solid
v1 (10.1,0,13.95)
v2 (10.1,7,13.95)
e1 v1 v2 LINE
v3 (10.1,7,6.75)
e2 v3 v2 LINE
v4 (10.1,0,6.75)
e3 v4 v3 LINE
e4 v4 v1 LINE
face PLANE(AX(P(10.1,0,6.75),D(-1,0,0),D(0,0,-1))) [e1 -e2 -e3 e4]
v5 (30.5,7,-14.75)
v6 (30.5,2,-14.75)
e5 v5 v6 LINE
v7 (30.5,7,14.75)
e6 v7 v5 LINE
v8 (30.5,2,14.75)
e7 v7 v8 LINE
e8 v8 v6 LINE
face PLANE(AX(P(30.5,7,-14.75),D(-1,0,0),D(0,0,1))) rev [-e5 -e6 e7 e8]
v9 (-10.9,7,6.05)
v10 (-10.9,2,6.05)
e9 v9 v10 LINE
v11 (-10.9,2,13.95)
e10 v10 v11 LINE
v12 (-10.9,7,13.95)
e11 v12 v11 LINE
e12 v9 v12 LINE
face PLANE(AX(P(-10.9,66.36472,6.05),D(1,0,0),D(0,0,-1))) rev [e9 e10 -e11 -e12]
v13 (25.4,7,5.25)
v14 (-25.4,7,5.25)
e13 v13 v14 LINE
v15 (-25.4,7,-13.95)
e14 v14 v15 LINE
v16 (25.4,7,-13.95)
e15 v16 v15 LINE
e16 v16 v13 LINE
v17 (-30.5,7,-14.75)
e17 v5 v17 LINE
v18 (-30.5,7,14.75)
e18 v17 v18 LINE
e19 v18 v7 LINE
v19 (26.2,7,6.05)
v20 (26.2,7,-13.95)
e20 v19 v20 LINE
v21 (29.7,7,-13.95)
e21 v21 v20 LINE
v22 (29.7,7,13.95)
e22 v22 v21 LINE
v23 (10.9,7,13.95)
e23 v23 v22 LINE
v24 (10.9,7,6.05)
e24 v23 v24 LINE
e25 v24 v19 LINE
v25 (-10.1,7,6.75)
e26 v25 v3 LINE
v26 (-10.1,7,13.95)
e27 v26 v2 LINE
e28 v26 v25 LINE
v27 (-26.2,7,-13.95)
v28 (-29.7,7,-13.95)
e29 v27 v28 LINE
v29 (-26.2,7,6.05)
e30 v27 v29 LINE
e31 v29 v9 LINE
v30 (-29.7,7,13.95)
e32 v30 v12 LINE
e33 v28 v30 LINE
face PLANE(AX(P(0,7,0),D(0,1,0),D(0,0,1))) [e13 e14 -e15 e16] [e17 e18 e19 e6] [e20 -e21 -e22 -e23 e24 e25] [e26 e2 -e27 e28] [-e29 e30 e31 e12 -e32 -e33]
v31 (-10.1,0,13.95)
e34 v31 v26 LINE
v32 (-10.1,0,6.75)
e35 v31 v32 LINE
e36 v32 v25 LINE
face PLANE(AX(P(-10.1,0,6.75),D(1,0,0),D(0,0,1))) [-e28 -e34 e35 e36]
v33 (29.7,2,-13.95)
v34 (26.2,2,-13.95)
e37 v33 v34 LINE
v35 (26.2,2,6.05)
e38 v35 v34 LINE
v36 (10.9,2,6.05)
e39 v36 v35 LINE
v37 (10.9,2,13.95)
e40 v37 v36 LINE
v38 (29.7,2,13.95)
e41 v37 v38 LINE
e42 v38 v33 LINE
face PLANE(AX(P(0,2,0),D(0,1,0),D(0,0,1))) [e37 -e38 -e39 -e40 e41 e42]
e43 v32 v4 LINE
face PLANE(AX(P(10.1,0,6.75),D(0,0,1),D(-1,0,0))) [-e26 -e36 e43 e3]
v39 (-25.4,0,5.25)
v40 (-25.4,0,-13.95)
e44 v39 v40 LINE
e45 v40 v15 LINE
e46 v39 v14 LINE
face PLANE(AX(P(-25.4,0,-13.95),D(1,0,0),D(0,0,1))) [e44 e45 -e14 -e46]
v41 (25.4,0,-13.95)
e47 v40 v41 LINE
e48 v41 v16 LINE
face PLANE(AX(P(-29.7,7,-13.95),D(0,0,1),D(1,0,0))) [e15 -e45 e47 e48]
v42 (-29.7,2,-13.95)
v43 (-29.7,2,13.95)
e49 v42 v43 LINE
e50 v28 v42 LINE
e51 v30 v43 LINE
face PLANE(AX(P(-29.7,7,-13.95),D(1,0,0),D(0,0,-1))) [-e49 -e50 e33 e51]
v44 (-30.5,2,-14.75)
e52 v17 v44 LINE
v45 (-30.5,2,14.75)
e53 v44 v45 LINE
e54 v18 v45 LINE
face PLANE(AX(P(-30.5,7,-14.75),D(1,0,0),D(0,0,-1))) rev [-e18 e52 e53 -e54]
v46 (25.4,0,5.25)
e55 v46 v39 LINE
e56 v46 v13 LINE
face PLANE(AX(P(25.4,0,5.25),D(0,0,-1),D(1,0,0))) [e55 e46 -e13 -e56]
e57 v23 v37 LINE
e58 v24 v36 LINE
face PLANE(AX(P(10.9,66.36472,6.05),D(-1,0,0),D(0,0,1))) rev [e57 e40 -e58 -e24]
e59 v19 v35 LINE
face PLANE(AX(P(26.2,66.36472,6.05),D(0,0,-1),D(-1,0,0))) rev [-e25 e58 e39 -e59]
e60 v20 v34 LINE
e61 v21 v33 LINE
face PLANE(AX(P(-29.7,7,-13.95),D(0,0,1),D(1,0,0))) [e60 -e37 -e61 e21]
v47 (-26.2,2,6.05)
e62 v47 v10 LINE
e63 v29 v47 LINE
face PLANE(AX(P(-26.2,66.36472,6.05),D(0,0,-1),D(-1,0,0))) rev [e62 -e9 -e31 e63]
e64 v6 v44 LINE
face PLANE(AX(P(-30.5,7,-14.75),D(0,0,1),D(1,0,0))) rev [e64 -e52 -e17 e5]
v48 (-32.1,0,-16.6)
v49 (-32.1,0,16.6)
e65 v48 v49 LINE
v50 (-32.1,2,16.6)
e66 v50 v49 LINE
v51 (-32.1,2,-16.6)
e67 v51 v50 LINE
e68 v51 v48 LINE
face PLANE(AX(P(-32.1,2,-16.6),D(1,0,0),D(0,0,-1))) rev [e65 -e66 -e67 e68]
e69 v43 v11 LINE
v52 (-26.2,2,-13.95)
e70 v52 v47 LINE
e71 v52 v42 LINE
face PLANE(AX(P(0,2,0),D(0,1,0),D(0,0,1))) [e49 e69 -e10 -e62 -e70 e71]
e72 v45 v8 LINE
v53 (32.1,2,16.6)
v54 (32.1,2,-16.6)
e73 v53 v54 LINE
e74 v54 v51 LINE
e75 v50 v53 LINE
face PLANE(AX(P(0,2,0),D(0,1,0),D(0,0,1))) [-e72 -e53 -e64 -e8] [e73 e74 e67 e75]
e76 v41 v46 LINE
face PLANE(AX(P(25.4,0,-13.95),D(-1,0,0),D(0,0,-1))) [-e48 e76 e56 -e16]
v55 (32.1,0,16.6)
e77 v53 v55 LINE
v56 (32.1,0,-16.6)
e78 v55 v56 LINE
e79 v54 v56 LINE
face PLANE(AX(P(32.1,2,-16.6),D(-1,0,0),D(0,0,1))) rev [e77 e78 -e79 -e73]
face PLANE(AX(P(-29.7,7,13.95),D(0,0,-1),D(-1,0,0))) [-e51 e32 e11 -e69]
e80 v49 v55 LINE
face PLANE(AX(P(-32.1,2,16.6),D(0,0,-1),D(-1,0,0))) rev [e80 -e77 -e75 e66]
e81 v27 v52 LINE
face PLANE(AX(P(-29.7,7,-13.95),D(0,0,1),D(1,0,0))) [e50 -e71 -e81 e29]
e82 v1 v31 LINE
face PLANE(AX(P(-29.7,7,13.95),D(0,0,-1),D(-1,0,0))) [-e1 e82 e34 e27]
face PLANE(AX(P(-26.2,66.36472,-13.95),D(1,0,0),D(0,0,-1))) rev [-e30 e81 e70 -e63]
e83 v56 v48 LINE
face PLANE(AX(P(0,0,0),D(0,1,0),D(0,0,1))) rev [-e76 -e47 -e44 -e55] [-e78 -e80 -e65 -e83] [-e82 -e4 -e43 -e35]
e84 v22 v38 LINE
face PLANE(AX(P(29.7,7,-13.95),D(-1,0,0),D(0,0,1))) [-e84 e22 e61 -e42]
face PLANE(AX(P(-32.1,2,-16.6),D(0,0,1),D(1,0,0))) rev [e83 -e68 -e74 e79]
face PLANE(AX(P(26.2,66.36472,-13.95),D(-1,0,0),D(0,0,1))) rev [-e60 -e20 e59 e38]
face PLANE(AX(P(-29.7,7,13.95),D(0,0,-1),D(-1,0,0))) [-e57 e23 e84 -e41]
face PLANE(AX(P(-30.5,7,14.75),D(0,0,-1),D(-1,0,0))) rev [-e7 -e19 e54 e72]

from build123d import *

# Parameters (mm, degrees)
SKETCH_1_W          = 64.2
SKETCH_1_H          = 33.2
EXTRUDE_1_DEPTH     = 2
SKETCH_2_W          = 61
SKETCH_2_H          = 29.5
SKETCH_2_W_2        = 59.4
SKETCH_2_H_2        = 27.9
EXTRUDE_2_DEPTH     = 5
OTHER_START         = -13.95
OTHER_1_OUTLINE_W   = 50.8
OTHER_1_OUTLINE_H   = 2
OTHER_1_DEPTH       = 19.2
OTHER_START_2       = 6.75
OTHER_1_2_OUTLINE_W = 20.2
OTHER_1_2_OUTLINE_H = 2
OTHER_1_2_DEPTH     = 7.2
EXTRUDE_6_DEPTH     = 5


# Read off the part's stored shape, not the designer's step: Полость1
with BuildPart() as part:
    # Эскиз1 → Бобышка-Вытянуть1 (new body)
    with BuildSketch(Plane(origin=(0, 0, 0), x_dir=(1, 0, 0), z_dir=(0, 1, 0))):
        Rectangle(SKETCH_1_W, SKETCH_1_H)
    extrude(amount=EXTRUDE_1_DEPTH)

    # Эскиз2 → Бобышка-Вытянуть2 (add)
    with BuildSketch(Plane(origin=(0, 2, 0), x_dir=(1, 0, 0), z_dir=(0, 1, 0))):
        Rectangle(SKETCH_2_W, SKETCH_2_H)
        Rectangle(SKETCH_2_W_2, SKETCH_2_H_2, mode=Mode.SUBTRACT)
    extrude(amount=EXTRUDE_2_DEPTH)

    # Полость1 outline → Полость1 (cut)
    with BuildSketch(Plane.XY.offset(OTHER_START)):
        with Locations((0, 1)):
            Rectangle(OTHER_1_OUTLINE_W, OTHER_1_OUTLINE_H)
    extrude(amount=OTHER_1_DEPTH, mode=Mode.SUBTRACT)

    # Other 1 2 outline → Other 1 2 (cut)
    with BuildSketch(Plane.XY.offset(OTHER_START_2)):
        with Locations((0, 1)):
            Rectangle(OTHER_1_2_OUTLINE_W, OTHER_1_2_OUTLINE_H)
    extrude(amount=OTHER_1_2_DEPTH, mode=Mode.SUBTRACT)

    # Эскиз8 → Бобышка-Вытянуть6 (add)
    with BuildSketch(Plane(origin=(0, 2, 0), x_dir=(1, 0, 0), z_dir=(0, 1, 0))):
        Polygon((-26.2, 13.95), (-26.2, -6.05), (-10.9, -6.05), (-10.9, -13.95), (-10.1, -13.95), (-10.1, -6.75), (10.1, -6.75), (10.1, -13.95), (10.9, -13.95), (10.9, -6.05), (26.2, -6.05), (26.2, 13.95), (25.4, 13.95), (25.4, -5.25), (-25.4, -5.25), (-25.4, 13.95), align=None)
    extrude(amount=EXTRUDE_6_DEPTH)


solid = part.part
